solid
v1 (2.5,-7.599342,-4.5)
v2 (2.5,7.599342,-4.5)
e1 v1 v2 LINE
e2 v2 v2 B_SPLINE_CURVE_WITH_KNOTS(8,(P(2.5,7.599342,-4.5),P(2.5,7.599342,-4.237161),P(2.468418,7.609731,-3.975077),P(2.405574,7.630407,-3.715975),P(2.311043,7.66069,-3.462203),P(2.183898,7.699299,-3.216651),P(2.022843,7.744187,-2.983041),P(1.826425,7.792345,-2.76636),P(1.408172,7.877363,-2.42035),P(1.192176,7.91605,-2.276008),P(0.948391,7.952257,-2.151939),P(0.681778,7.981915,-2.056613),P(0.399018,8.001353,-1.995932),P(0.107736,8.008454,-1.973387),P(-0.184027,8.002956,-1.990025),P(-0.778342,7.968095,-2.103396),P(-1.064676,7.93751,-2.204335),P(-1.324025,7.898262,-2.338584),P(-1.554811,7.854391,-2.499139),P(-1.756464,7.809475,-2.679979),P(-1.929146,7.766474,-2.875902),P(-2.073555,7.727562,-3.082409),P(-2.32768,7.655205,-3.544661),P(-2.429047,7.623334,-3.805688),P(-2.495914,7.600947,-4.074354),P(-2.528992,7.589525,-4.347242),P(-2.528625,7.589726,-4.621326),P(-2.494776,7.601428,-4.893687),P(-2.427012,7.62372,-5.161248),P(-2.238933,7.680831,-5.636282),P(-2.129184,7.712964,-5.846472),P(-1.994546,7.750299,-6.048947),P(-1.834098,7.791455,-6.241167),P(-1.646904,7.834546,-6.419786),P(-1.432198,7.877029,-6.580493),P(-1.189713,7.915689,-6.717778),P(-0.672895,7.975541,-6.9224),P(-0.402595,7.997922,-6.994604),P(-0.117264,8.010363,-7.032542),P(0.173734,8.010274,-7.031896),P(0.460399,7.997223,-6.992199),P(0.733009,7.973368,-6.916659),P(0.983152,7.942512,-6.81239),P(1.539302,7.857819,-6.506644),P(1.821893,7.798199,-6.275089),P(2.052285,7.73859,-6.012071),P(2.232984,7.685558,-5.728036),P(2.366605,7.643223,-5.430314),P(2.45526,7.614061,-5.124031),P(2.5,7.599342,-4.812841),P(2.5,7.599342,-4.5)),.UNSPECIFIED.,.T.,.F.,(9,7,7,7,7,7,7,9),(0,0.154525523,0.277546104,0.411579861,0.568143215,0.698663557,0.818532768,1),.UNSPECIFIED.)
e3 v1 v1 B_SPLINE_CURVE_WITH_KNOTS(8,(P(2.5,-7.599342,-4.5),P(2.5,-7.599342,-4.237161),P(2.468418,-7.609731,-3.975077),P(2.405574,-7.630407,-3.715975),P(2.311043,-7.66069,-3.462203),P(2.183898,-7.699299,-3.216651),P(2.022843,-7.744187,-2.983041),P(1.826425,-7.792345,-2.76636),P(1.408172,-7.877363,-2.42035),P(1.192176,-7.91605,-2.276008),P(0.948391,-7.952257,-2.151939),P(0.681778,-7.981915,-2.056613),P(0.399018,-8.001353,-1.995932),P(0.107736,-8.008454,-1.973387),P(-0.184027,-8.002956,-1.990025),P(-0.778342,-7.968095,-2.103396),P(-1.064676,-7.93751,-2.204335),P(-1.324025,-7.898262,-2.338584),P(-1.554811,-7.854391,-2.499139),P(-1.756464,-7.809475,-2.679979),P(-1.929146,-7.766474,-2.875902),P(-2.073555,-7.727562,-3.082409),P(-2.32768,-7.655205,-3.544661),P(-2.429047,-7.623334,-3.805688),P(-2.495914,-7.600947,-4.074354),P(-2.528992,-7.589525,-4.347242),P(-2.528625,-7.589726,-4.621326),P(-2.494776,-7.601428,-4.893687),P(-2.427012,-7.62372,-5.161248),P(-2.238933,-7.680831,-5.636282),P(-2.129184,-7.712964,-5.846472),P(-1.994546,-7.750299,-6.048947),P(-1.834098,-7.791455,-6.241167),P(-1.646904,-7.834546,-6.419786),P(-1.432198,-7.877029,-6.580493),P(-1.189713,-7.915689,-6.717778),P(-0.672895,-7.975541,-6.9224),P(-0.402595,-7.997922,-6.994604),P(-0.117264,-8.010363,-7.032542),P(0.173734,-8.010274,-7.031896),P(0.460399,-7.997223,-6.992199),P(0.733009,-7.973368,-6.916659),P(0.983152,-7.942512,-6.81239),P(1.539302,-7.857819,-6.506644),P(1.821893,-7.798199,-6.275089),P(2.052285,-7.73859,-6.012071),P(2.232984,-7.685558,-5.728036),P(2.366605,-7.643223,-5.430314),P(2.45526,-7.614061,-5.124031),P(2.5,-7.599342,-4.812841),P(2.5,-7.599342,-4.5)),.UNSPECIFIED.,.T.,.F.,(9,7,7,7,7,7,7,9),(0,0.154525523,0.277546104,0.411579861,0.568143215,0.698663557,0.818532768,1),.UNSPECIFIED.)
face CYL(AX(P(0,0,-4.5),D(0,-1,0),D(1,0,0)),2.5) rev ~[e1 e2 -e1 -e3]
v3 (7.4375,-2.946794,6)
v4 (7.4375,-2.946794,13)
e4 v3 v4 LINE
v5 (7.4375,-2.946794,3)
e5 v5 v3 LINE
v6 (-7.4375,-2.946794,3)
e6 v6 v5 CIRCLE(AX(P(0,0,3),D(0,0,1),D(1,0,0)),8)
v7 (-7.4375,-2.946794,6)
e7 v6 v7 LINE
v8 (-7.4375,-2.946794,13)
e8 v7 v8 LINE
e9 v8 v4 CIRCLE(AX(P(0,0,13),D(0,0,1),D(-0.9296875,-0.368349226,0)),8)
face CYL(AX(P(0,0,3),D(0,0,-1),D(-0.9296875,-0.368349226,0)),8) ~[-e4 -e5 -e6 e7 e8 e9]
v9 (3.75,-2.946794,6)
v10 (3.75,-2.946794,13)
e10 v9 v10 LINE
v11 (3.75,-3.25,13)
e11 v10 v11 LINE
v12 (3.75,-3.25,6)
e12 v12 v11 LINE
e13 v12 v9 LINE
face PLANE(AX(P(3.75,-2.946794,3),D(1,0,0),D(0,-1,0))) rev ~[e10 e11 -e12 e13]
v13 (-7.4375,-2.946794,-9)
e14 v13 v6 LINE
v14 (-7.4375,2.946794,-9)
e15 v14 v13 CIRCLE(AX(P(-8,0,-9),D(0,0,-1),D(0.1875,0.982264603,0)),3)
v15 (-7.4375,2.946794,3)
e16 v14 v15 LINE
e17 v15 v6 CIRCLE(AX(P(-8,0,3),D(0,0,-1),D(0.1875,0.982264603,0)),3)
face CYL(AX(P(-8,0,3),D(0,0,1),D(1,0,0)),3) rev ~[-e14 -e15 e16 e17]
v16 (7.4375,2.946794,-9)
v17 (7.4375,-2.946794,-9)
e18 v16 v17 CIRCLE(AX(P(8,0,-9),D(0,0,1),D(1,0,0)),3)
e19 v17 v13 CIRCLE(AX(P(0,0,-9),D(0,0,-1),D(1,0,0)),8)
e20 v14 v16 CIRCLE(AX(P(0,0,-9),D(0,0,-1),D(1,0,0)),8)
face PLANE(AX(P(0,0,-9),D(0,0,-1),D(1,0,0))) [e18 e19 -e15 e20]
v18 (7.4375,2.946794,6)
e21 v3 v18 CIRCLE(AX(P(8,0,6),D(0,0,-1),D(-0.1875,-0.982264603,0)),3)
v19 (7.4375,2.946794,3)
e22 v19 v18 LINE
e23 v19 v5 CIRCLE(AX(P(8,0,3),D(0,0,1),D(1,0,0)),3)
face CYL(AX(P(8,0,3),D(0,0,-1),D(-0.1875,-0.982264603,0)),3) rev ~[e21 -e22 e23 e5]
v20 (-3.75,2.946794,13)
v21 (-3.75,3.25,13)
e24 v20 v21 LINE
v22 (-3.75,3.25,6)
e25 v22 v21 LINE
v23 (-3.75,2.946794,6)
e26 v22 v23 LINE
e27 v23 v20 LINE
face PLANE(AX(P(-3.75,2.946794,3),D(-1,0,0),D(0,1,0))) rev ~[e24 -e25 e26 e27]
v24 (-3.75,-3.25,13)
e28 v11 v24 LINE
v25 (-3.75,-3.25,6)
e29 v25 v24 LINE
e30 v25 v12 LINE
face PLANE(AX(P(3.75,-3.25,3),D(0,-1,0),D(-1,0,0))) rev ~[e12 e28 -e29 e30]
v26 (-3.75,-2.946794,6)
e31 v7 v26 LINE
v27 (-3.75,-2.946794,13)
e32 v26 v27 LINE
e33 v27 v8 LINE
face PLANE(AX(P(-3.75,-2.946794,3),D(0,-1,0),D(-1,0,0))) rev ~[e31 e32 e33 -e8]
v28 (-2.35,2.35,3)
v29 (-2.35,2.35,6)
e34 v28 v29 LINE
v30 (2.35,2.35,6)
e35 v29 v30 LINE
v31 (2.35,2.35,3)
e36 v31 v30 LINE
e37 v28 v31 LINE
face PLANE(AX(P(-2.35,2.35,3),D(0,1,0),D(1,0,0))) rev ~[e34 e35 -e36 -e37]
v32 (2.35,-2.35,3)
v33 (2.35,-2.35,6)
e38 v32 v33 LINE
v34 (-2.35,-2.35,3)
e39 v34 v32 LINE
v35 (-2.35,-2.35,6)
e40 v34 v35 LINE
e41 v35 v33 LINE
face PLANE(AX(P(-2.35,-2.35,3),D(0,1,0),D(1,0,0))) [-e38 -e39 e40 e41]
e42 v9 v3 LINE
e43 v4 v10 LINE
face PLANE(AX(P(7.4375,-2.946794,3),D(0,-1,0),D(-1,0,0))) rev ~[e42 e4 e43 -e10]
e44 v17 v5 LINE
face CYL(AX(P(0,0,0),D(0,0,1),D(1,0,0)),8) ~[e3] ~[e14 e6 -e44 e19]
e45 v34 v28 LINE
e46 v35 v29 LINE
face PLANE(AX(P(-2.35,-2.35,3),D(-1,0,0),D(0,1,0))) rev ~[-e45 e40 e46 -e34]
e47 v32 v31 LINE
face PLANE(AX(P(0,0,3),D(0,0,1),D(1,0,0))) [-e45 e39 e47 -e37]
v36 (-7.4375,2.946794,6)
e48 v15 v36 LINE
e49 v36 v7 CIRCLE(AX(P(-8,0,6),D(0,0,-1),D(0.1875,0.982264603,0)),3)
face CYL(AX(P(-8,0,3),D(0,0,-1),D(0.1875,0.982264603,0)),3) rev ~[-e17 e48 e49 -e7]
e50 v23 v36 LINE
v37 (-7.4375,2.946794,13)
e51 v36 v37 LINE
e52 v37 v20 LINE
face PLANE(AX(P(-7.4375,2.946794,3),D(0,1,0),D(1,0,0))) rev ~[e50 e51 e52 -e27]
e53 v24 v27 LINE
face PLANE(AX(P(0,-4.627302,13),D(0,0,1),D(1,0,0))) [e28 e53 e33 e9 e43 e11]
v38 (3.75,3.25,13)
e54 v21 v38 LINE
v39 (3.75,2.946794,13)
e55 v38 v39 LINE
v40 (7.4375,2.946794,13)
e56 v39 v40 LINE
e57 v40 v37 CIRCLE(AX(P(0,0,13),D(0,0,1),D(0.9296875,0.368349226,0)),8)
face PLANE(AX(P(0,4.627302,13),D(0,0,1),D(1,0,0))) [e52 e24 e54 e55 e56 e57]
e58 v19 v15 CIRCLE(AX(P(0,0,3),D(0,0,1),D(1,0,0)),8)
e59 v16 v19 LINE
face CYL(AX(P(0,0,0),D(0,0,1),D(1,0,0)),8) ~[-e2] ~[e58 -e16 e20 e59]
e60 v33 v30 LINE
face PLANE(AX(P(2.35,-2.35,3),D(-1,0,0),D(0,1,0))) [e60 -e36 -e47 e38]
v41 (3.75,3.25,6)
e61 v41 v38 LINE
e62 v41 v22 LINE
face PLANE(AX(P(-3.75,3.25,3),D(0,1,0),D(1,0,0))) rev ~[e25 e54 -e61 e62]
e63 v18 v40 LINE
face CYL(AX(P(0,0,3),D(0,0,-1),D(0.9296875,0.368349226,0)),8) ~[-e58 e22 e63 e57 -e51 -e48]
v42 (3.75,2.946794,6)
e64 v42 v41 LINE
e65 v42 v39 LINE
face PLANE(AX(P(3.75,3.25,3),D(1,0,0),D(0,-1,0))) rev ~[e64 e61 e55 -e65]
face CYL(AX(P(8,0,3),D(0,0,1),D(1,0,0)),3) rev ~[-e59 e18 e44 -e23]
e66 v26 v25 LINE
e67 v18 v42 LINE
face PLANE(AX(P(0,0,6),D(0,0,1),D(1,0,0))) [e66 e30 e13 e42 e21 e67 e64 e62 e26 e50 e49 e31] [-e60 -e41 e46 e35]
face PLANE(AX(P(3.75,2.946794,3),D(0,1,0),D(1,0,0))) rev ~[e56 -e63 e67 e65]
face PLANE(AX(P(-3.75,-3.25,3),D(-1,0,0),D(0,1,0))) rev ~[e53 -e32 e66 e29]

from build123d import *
from build123d import SkipClean  # not in build123d's __all__

# Parameters (mm, degrees)
F0_R           = 8
F1_DEPTH       = 3
F2_R           = 8
F3_DEPTH       = 9
F4_R           = 3
F5_DEPTH       = 12.5
F7_DEPTH       = 10
F8_W           = 4.7
F8_H           = 4.7
F9_DEPTH       = 3
F10_R          = 2.5
F11_DEPTH      = 8.001
F11_DEPTH_BACK = 25


# Not quite as in the source:
# - after a boolean that leaves OpenCascade's solid faulty, fix() repairs it


with BuildPart() as f1:
    # F0 (on Top) → F1 (new body)
    with BuildSketch(Plane.XY):
        Circle(F0_R)
    extrude(amount=F1_DEPTH)

    # F2 (on face) → F3 (join)
    with BuildSketch(Plane(origin=(0, 0, 0), x_dir=(1, 0, 0), z_dir=(0, 0, -1))):
        Circle(F2_R)
    extrude(amount=F3_DEPTH)

    # F4 (on face) → F5 (cut, symmetric)
    with BuildSketch(Plane.XY.offset(3)):
        with Locations((-8, 0)):
            Circle(F4_R)
        with Locations((8, 0)):
            Circle(F4_R)
    extrude(amount=F5_DEPTH, both=True, mode=Mode.SUBTRACT)

    # F6 (on face) → F7 (join)
    with BuildSketch(Plane.XY.offset(3)):
        with BuildLine():
            ThreePointArc((-7.4375, -2.9467938085), (0, -8), (7.4375, -2.9467938085))
            Line((7.4375, -2.9467938085), (3.75, -2.9467938085))
            Line((3.75, -2.9467938085), (3.75, -3.25))
            Line((3.75, -3.25), (-3.75, -3.25))
            Line((-3.75, -3.25), (-3.75, -2.9467938085))
            Line((-3.75, -2.9467938085), (-7.4375, -2.9467938085))
        make_face()
        with BuildLine():
            Line((-3.75, 3.25), (3.75, 3.25))
            Line((3.75, 3.25), (3.75, 2.9467938085))
            Line((3.75, 2.9467938085), (7.4375, 2.9467938085))
            ThreePointArc((7.4375, 2.9467938085), (0, 8), (-7.4375, 2.9467938085))
            Line((-7.4375, 2.9467938085), (-3.75, 2.9467938085))
            Line((-3.75, 2.9467938085), (-3.75, 3.25))
        make_face()
    extrude(amount=F7_DEPTH)

    # F8 (on face) → F9 (join)
    with BuildSketch(Plane.XY.offset(3)):
        with BuildLine():
            ThreePointArc((-7.4375, 2.9467938085), (-5, 0), (-7.4375, -2.9467938085))
            Line((-7.4375, -2.9467938085), (-3.75, -2.9467938085))
            Line((-3.75, -2.9467938085), (-3.75, -3.25))
            Line((-3.75, -3.25), (3.75, -3.25))
            Line((3.75, -3.25), (3.75, -2.9467938085))
            Line((3.75, -2.9467938085), (7.4375, -2.9467938085))
            ThreePointArc((7.4375, -2.9467938085), (5, 0), (7.4375, 2.9467938085))
            Line((7.4375, 2.9467938085), (3.75, 2.9467938085))
            Line((3.75, 2.9467938085), (3.75, 3.25))
            Line((3.75, 3.25), (-3.75, 3.25))
            Line((-3.75, 3.25), (-3.75, 2.9467938085))
            Line((-3.75, 2.9467938085), (-7.4375, 2.9467938085))
        make_face()
        Rectangle(F8_W, F8_H, mode=Mode.SUBTRACT)
    with SkipClean():  # cleaning this boolean's faces spoils the solid; the shape is the same uncleaned
        extrude(amount=F9_DEPTH)

    # F10 (on Front) → F11 (cut, two sides)
    with BuildSketch(Plane.XZ) as f11_sk:
        with Locations((0, -4.5)):
            Circle(F10_R)
    extrude(amount=-F11_DEPTH, mode=Mode.SUBTRACT)
    extrude(f11_sk.sketch, amount=F11_DEPTH_BACK, mode=Mode.SUBTRACT)

    add(f1.part.fix(), mode=Mode.REPLACE)


solid = f1.part
